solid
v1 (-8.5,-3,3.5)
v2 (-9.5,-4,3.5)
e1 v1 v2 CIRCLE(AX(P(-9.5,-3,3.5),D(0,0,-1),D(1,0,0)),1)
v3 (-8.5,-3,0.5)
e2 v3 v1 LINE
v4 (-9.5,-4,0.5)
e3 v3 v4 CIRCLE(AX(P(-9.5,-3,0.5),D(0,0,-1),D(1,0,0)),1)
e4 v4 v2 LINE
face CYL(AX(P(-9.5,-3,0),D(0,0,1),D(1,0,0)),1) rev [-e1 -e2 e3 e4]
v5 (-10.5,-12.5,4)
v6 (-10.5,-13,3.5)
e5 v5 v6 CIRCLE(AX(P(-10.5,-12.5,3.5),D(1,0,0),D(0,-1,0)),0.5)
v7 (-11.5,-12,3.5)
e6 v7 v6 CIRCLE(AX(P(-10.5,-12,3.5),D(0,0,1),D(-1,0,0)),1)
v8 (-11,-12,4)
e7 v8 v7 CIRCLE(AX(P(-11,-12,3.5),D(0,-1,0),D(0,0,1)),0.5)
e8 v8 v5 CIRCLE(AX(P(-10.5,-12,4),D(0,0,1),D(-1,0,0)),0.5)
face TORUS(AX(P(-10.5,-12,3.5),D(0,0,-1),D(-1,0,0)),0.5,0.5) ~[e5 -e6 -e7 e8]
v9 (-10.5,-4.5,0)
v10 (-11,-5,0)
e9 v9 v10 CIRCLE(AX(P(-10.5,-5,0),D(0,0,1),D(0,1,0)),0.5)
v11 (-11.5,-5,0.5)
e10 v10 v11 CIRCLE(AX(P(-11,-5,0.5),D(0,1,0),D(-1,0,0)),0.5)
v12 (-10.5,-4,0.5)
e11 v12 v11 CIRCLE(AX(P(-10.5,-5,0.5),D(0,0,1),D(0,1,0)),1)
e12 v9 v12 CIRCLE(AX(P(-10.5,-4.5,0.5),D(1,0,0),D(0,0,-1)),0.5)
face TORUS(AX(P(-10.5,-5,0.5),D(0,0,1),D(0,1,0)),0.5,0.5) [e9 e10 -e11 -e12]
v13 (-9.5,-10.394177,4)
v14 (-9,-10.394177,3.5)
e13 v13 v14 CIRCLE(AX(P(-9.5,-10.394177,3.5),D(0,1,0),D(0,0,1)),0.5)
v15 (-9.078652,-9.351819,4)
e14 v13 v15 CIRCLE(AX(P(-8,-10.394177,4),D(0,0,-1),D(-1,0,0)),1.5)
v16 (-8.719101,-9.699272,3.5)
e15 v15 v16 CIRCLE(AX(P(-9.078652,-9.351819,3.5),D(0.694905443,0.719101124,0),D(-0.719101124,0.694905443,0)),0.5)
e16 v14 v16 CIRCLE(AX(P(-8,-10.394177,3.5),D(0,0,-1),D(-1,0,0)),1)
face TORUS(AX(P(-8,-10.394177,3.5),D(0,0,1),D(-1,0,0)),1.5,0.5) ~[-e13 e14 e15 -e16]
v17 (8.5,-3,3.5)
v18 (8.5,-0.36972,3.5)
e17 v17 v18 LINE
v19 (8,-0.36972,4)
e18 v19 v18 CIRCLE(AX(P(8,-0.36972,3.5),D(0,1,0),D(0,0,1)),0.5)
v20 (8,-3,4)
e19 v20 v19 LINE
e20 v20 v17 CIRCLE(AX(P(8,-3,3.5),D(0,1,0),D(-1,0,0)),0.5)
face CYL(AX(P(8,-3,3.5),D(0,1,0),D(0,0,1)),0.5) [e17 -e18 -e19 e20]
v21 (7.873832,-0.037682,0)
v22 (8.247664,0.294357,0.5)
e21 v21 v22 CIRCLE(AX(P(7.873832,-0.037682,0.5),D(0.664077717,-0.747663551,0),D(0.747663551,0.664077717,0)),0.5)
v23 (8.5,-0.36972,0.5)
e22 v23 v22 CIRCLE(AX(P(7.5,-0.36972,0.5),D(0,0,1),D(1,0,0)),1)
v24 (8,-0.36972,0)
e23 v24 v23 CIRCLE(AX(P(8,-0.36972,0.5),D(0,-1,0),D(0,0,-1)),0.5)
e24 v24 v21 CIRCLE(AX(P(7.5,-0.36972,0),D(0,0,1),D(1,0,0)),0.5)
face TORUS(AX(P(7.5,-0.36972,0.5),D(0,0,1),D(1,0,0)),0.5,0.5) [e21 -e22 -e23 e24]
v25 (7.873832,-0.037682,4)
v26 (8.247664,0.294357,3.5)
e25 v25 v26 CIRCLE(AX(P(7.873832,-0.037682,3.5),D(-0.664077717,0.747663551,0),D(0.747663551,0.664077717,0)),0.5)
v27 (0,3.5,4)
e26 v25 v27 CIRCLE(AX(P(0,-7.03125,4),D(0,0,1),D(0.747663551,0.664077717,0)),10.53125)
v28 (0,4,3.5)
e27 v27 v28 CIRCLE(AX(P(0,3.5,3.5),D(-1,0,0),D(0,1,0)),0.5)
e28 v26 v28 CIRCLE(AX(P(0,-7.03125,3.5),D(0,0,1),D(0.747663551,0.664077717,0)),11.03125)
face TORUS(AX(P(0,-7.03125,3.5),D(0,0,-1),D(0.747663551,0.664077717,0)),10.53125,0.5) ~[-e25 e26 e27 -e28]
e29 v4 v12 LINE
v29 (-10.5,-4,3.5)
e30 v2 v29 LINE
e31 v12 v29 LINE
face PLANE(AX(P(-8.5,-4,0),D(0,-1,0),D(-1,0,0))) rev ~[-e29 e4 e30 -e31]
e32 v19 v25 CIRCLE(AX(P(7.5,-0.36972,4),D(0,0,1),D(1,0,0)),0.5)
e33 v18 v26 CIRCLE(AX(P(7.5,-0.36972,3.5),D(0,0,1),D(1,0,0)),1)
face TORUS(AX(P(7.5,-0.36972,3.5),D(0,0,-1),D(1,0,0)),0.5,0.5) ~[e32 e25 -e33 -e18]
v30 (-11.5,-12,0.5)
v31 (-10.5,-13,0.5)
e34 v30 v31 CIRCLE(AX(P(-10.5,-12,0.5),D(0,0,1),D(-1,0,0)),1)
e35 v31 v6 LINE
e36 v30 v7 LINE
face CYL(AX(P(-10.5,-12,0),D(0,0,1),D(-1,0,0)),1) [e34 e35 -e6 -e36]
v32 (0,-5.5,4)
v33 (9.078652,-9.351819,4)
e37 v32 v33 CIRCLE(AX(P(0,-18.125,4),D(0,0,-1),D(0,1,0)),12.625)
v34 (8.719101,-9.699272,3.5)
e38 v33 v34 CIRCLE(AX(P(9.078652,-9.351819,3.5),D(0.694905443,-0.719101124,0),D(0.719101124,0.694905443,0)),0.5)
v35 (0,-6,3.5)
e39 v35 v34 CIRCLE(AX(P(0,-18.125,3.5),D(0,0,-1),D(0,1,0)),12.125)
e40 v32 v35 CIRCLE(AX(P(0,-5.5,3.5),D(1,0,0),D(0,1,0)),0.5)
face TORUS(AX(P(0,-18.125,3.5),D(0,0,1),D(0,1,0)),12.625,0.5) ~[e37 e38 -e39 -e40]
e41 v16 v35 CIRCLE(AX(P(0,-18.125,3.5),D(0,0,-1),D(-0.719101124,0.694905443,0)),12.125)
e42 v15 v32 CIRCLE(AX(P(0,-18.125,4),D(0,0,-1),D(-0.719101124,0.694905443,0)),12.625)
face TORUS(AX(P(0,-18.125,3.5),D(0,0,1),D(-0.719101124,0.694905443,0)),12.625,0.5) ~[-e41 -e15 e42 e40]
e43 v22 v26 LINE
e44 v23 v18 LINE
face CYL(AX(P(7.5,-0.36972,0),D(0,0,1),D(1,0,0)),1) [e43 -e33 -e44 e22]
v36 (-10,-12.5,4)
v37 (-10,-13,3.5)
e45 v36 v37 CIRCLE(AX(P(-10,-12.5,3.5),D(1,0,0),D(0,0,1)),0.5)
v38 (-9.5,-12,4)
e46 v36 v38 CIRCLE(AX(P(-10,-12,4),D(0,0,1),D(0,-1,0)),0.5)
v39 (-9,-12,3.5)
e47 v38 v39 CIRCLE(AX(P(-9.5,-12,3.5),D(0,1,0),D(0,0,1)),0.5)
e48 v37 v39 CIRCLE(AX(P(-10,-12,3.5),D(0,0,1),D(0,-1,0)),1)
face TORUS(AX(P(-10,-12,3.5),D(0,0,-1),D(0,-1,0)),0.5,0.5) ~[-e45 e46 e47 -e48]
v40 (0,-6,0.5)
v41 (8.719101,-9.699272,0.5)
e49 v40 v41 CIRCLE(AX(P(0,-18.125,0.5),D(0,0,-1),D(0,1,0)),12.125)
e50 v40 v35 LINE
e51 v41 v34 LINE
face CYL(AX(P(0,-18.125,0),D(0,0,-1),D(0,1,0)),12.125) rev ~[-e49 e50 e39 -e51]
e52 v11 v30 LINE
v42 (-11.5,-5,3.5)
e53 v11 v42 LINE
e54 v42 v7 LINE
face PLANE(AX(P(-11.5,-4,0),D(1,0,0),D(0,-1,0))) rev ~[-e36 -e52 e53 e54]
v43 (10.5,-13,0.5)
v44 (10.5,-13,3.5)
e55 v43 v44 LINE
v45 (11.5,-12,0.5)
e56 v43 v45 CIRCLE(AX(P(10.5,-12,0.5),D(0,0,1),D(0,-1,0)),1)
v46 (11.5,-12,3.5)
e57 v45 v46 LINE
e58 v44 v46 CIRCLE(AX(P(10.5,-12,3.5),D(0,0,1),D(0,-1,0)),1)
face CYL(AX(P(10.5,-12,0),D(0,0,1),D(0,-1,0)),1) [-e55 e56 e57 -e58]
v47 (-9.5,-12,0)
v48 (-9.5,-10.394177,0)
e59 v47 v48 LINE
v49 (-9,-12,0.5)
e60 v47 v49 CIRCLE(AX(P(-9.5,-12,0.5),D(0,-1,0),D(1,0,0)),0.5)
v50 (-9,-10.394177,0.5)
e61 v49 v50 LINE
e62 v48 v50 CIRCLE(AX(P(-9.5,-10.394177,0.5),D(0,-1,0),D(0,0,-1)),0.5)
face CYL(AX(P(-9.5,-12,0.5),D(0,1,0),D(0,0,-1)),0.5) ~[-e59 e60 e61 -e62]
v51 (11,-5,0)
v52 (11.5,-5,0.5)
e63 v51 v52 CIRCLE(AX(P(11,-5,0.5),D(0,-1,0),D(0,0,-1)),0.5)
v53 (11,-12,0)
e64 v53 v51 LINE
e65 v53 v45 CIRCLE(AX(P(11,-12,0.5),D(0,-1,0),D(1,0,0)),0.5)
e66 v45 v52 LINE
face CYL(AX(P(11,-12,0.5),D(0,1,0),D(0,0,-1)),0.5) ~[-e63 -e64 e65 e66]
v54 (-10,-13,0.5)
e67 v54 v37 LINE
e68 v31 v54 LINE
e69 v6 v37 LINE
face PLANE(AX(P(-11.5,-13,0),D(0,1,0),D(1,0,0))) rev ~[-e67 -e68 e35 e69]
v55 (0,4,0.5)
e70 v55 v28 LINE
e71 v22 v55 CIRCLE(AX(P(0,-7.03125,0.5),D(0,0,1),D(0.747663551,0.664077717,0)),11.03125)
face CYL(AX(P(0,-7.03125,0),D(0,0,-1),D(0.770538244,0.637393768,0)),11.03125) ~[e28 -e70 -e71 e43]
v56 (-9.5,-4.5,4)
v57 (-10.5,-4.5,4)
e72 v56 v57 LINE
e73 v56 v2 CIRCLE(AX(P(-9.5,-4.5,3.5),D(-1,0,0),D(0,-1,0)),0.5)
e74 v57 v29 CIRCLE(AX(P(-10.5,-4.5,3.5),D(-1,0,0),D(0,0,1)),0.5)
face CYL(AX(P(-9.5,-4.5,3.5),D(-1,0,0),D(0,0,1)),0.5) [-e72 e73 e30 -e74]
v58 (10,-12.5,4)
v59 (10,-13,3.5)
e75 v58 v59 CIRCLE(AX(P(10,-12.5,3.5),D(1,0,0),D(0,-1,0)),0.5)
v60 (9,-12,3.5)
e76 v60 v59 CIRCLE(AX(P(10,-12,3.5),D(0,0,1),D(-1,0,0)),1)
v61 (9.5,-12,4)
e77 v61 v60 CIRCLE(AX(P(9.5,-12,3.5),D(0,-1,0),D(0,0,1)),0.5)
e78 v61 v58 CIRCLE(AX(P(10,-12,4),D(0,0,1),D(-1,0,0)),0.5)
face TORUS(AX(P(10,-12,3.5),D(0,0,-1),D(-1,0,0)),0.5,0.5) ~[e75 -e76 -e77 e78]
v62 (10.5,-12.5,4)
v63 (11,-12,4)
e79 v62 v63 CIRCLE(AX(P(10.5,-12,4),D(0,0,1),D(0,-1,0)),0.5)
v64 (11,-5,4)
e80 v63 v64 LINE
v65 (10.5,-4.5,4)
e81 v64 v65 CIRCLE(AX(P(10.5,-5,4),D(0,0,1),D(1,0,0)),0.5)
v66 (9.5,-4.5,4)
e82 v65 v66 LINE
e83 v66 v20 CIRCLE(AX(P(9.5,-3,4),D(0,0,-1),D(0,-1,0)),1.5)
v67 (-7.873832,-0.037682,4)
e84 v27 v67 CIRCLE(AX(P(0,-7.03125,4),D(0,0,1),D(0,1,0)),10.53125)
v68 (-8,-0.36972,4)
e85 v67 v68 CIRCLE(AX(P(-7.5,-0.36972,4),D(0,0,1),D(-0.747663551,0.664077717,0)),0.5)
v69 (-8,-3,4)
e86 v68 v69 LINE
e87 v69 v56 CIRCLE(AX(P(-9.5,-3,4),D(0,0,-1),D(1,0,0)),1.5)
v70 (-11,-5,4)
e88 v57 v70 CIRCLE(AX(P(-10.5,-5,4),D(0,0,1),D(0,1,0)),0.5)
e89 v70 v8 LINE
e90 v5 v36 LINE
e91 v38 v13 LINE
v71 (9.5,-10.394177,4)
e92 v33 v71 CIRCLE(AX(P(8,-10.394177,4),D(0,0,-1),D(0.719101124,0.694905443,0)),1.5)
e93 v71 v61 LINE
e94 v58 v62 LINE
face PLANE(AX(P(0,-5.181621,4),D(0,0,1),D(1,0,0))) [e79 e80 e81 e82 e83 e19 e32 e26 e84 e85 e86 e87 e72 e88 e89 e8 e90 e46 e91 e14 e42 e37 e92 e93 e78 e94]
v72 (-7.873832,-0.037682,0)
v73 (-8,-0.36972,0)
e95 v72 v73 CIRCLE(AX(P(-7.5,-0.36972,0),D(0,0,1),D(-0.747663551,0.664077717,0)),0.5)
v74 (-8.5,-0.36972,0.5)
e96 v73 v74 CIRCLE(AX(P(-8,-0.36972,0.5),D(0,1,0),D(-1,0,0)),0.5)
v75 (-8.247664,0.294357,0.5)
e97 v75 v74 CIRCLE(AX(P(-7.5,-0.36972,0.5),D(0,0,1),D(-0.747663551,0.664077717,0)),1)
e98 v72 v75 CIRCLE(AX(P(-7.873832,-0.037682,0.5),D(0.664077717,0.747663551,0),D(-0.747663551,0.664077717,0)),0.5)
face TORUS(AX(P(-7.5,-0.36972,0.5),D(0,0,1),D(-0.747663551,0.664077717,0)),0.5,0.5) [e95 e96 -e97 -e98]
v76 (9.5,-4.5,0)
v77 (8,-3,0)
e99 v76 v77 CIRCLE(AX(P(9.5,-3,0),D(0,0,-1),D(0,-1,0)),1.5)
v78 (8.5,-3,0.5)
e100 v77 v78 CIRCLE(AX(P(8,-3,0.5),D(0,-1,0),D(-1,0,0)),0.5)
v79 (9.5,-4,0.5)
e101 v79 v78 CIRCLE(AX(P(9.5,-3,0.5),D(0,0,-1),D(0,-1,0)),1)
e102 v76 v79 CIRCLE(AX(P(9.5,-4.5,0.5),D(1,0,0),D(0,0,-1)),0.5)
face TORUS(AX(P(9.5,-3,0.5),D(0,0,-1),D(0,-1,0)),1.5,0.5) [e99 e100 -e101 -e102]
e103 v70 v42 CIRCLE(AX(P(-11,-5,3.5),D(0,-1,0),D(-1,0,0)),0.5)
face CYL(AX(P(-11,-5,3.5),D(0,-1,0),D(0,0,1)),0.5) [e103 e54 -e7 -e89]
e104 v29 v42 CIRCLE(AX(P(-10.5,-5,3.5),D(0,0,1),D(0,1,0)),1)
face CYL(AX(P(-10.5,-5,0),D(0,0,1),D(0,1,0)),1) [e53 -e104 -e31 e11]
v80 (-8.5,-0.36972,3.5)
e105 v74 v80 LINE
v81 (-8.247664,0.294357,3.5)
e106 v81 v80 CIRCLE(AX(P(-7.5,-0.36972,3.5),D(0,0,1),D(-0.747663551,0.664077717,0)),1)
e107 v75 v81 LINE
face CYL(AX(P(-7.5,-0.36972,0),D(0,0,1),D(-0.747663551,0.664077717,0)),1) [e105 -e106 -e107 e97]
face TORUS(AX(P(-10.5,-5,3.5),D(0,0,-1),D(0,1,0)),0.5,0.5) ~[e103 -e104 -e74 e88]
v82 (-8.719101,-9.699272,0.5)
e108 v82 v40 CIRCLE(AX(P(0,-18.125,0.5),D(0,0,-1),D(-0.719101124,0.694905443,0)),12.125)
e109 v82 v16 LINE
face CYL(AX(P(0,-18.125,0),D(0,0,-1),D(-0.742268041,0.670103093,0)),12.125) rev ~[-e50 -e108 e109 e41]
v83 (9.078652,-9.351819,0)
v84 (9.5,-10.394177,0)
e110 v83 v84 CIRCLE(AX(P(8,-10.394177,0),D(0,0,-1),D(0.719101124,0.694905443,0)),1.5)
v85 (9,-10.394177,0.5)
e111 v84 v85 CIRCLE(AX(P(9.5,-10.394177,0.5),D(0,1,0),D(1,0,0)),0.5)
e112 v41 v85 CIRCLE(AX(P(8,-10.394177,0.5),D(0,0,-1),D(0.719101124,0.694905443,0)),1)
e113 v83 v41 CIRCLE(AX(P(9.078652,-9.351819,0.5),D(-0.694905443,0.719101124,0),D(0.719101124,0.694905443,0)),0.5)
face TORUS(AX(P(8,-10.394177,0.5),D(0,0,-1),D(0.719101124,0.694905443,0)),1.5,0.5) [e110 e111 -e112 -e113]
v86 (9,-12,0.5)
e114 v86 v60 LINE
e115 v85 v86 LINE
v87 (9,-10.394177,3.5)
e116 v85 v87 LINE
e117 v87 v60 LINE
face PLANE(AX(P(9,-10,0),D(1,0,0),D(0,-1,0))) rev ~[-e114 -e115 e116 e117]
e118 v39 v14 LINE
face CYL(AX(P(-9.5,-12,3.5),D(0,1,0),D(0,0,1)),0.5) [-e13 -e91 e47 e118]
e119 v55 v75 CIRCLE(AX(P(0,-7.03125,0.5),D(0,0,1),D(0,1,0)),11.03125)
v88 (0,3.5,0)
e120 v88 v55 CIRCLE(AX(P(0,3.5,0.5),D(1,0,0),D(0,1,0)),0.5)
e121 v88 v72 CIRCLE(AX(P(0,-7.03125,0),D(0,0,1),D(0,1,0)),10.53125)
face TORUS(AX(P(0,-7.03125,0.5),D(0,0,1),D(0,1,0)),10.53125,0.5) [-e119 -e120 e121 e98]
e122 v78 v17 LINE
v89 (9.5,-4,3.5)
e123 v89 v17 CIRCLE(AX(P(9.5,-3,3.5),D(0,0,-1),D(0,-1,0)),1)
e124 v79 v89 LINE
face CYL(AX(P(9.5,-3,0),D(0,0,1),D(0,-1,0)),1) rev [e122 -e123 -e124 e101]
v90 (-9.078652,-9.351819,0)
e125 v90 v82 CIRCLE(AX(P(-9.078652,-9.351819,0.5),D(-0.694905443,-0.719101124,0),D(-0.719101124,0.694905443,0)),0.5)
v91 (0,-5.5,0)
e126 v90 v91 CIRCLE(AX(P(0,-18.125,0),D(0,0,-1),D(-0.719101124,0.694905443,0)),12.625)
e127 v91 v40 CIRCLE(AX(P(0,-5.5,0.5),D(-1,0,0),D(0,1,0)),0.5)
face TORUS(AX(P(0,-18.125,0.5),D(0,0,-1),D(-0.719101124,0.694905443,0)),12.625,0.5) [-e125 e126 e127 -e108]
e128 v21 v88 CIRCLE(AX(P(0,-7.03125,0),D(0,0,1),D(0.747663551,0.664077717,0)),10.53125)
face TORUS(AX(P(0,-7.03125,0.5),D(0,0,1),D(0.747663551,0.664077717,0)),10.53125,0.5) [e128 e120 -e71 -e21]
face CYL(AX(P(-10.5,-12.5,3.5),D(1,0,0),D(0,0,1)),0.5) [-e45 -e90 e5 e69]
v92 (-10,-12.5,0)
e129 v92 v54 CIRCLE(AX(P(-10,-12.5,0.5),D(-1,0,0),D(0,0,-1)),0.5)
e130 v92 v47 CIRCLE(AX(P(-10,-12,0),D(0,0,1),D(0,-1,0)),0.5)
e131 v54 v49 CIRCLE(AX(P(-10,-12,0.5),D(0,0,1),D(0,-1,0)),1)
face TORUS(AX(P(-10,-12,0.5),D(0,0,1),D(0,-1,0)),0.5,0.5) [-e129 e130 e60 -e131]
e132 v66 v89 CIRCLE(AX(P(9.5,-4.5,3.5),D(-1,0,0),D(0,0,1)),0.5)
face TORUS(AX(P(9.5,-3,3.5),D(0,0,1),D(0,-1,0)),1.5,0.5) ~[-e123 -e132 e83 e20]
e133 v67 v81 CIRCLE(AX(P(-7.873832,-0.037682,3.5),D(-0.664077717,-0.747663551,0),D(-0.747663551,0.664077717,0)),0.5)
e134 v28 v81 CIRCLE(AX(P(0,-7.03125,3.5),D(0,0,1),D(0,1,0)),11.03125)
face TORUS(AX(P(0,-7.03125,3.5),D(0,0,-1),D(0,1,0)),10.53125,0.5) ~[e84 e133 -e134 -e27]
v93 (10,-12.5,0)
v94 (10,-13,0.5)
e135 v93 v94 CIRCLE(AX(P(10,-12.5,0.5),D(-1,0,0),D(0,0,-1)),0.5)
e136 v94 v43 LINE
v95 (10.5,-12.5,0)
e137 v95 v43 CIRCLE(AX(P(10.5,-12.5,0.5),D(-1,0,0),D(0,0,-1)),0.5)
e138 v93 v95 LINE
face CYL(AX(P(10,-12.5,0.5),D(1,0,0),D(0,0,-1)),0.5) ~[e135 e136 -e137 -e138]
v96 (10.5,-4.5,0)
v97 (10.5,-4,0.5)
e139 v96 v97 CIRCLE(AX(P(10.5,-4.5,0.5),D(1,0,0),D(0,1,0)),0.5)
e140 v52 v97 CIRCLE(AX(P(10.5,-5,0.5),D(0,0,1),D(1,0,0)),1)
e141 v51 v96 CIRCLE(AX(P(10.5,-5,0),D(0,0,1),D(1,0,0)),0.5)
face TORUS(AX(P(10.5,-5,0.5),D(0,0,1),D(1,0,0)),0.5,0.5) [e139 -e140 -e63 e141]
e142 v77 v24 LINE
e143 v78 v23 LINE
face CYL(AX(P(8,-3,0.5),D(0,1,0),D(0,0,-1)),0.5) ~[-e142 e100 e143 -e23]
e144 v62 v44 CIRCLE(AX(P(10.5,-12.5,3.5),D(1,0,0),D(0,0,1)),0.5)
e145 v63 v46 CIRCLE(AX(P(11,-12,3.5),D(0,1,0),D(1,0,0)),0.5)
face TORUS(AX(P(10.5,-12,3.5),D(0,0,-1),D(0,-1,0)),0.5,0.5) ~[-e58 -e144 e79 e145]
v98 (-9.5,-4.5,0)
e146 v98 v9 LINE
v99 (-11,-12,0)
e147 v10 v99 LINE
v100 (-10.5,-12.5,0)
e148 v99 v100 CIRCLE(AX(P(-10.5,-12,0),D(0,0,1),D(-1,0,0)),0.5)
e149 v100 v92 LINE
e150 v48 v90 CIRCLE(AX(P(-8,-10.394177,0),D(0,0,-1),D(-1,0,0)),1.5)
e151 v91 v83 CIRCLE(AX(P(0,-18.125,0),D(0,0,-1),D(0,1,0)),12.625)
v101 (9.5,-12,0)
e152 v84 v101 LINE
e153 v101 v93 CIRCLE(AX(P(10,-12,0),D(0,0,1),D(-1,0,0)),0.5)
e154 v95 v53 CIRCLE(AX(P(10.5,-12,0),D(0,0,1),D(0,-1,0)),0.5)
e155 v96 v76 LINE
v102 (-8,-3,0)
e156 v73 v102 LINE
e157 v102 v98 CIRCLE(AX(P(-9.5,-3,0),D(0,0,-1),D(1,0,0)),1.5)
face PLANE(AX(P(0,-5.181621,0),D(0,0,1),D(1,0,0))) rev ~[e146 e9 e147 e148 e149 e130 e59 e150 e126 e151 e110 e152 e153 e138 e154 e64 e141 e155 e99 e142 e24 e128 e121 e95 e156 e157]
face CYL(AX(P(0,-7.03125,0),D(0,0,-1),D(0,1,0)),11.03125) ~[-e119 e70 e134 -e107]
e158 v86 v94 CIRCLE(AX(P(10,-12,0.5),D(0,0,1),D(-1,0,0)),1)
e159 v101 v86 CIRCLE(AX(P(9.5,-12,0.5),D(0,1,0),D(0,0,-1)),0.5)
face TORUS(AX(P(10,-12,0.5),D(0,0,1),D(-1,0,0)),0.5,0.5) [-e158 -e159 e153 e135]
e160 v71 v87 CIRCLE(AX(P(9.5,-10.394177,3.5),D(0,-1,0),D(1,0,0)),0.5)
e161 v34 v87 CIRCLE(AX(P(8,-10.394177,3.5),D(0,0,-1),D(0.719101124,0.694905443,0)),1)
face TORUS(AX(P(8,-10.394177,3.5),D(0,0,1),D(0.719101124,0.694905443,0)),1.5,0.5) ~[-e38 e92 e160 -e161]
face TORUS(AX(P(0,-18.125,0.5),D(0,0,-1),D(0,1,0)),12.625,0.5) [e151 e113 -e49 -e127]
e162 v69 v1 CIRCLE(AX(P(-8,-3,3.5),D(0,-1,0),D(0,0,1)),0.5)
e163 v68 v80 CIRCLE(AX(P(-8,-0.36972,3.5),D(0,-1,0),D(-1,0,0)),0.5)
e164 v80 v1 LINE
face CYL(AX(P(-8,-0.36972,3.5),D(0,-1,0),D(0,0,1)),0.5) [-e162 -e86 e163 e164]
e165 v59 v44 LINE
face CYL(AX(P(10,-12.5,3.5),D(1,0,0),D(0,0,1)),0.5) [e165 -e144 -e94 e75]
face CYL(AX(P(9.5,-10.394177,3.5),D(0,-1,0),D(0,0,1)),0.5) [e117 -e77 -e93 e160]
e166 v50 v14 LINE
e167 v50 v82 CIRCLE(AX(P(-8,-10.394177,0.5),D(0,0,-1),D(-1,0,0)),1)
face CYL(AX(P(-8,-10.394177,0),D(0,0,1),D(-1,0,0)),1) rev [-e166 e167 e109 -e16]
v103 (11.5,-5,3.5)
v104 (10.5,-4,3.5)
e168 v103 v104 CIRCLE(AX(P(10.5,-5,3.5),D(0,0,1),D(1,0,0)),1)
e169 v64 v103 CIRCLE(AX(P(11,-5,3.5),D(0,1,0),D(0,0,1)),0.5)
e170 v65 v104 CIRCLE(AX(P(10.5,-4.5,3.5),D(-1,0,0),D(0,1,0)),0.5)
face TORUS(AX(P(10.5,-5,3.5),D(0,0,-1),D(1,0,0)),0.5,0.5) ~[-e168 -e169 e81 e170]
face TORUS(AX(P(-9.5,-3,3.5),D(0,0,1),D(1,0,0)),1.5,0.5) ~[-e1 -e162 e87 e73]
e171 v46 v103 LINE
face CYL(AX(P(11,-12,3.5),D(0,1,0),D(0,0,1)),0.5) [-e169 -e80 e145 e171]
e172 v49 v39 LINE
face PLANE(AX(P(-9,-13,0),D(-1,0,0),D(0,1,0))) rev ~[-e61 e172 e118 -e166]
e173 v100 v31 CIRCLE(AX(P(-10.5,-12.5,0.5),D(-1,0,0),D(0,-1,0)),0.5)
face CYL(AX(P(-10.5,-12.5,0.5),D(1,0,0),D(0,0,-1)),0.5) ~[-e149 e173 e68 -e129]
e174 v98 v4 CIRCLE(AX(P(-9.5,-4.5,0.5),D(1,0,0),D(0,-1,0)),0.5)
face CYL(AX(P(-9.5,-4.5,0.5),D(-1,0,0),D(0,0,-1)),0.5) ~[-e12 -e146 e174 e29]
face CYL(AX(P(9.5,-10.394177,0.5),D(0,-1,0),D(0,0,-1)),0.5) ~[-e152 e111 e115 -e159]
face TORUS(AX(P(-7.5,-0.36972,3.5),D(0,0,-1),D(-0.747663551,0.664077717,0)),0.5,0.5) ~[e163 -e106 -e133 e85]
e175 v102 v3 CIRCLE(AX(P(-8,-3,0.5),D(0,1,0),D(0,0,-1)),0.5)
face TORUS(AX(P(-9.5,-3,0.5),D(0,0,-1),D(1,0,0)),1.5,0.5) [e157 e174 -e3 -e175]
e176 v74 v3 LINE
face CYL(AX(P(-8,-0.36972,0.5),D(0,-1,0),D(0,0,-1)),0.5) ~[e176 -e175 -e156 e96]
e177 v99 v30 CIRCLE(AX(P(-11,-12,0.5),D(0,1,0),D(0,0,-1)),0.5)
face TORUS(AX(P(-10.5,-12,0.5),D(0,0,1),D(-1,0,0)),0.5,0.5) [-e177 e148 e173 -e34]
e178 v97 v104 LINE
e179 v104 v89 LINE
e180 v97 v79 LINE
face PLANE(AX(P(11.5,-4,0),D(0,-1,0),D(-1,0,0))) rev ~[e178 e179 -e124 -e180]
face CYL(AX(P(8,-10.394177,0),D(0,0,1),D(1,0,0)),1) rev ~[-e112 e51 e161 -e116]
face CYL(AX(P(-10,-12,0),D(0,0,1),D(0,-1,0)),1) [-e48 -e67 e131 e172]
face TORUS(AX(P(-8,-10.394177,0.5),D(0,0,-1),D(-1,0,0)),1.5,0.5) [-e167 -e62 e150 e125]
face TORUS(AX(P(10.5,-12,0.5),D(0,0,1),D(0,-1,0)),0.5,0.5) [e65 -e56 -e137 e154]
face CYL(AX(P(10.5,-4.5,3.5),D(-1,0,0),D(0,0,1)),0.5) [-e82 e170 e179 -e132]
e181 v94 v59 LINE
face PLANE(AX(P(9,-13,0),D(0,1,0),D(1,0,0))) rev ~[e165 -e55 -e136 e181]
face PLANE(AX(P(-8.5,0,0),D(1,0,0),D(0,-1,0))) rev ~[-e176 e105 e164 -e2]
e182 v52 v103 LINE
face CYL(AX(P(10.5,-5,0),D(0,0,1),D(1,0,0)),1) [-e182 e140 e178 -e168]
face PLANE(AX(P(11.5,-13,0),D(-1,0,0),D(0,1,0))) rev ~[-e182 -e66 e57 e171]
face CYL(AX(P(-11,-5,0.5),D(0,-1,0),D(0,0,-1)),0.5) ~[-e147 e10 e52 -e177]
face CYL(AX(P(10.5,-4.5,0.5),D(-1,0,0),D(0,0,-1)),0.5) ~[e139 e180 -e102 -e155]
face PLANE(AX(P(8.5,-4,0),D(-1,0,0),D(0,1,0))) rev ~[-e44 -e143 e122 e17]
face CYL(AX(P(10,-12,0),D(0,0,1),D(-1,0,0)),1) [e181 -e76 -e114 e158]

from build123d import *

# Parameters (mm, degrees)
F1_DEPTH = 4
F2_R     = 1
F3_R     = 0.5


# Not quite as in the source:
# - a feature names something its author has since deleted; it is built from what else it names


with BuildPart() as f1:
    # F0 (on Top) → F1 (new body)
    with BuildSketch(Plane.XY):
        with BuildLine():
            Line((9, -10), (9, -13))
            Line((9, -13), (11.5, -13))
            Line((11.5, -13), (11.5, -4))
            Line((11.5, -4), (8.5, -4))
            Line((8.5, -4), (8.5, 0))
            ThreePointArc((8.5, 0), (4.697073557, 2.9500313087), (0, 4))
            ThreePointArc((0, 4), (-4.697073557, 2.9500313087), (-8.5, 0))
            Line((-8.5, 0), (-8.5, -4))
            Line((-8.5, -4), (-11.5, -4))
            Line((-11.5, -4), (-11.5, -13))
            Line((-11.5, -13), (-9, -13))
            Line((-9, -13), (-9, -10))
            ThreePointArc((-9, -10), (-4.9244289009, -7.045034973), (0, -6))
            ThreePointArc((0, -6), (4.9244289009, -7.045034973), (9, -10))
        make_face()
    extrude(amount=F1_DEPTH)

    # F2
    f2_edges = [f1.edges().sort_by_distance(p)[0] for p in [
        (-9, -13, 2),
        (9, -13, 2),
        (-11.5, -4, 2),
        (-8.5, -4, 2),
        (8.5, -4, 2),
        (11.5, -4, 2),
        (9, -10, 2),
        (-9, -10, 2),
        (-11.5, -13, 2),
        (-8.5, 0, 2),
        (8.5, 0, 2),
        (11.5, -13, 2),
    ]]
    fillet(f2_edges, radius=F2_R)

    # F3
    f3_edges = [f1.edges().sort_by_distance(p)[0] for p in [
        (-9, -11.197088, 4),
        (0, -6, 4),
        (8.927119, -10.019411, 4),
        (-8.927119, -10.019411, 4),
        (9, -11.197088, 4),
        (9.292893, -12.707107, 4),
        (-9.292893, -12.707107, 4),
        (10.25, -13, 4),
        (-10.25, -13, 4),
        (11.207107, -12.707107, 4),
        (-11.207107, -12.707107, 4),
        (11.5, -8.5, 4),
        (-11.5, -8.5, 4),
        (11.207107, -4.292893, 4),
        (-11.207107, -4.292893, 4),
        (10, -4, 4),
        (-10, -4, 4),
        (8.792893, -3.707107, 4),
        (-8.792893, -3.707107, 4),
        (8.5, -1.68486, 4),
        (-8.5, -1.68486, 4),
        (8.43479, -0.014519, 4),
        (-8.43479, -0.014519, 4),
        (0, 4, 4),
        (10.25, -13, 0),
        (9, -11.197088, 0),
        (-9, -11.197088, 0),
        (-10.25, -13, 0),
        (0, -6, 0),
        (8.927119, -10.019411, 0),
        (9.292893, -12.707107, 0),
        (-8.927119, -10.019411, 0),
        (11.207107, -12.707107, 0),
        (11.5, -8.5, 0),
        (-9.292893, -12.707107, 0),
        (11.207107, -4.292893, 0),
        (10, -4, 0),
        (-11.207107, -12.707107, 0),
        (8.792893, -3.707107, 0),
        (-11.5, -8.5, 0),
        (8.5, -1.68486, 0),
        (-11.207107, -4.292893, 0),
        (8.43479, -0.014519, 0),
        (-10, -4, 0),
        (0, 4, 0),
        (-8.792893, -3.707107, 0),
        (-8.43479, -0.014519, 0),
        (-8.5, -1.68486, 0),
    ]]
    fillet(f3_edges, radius=F3_R)


solid = f1.part
